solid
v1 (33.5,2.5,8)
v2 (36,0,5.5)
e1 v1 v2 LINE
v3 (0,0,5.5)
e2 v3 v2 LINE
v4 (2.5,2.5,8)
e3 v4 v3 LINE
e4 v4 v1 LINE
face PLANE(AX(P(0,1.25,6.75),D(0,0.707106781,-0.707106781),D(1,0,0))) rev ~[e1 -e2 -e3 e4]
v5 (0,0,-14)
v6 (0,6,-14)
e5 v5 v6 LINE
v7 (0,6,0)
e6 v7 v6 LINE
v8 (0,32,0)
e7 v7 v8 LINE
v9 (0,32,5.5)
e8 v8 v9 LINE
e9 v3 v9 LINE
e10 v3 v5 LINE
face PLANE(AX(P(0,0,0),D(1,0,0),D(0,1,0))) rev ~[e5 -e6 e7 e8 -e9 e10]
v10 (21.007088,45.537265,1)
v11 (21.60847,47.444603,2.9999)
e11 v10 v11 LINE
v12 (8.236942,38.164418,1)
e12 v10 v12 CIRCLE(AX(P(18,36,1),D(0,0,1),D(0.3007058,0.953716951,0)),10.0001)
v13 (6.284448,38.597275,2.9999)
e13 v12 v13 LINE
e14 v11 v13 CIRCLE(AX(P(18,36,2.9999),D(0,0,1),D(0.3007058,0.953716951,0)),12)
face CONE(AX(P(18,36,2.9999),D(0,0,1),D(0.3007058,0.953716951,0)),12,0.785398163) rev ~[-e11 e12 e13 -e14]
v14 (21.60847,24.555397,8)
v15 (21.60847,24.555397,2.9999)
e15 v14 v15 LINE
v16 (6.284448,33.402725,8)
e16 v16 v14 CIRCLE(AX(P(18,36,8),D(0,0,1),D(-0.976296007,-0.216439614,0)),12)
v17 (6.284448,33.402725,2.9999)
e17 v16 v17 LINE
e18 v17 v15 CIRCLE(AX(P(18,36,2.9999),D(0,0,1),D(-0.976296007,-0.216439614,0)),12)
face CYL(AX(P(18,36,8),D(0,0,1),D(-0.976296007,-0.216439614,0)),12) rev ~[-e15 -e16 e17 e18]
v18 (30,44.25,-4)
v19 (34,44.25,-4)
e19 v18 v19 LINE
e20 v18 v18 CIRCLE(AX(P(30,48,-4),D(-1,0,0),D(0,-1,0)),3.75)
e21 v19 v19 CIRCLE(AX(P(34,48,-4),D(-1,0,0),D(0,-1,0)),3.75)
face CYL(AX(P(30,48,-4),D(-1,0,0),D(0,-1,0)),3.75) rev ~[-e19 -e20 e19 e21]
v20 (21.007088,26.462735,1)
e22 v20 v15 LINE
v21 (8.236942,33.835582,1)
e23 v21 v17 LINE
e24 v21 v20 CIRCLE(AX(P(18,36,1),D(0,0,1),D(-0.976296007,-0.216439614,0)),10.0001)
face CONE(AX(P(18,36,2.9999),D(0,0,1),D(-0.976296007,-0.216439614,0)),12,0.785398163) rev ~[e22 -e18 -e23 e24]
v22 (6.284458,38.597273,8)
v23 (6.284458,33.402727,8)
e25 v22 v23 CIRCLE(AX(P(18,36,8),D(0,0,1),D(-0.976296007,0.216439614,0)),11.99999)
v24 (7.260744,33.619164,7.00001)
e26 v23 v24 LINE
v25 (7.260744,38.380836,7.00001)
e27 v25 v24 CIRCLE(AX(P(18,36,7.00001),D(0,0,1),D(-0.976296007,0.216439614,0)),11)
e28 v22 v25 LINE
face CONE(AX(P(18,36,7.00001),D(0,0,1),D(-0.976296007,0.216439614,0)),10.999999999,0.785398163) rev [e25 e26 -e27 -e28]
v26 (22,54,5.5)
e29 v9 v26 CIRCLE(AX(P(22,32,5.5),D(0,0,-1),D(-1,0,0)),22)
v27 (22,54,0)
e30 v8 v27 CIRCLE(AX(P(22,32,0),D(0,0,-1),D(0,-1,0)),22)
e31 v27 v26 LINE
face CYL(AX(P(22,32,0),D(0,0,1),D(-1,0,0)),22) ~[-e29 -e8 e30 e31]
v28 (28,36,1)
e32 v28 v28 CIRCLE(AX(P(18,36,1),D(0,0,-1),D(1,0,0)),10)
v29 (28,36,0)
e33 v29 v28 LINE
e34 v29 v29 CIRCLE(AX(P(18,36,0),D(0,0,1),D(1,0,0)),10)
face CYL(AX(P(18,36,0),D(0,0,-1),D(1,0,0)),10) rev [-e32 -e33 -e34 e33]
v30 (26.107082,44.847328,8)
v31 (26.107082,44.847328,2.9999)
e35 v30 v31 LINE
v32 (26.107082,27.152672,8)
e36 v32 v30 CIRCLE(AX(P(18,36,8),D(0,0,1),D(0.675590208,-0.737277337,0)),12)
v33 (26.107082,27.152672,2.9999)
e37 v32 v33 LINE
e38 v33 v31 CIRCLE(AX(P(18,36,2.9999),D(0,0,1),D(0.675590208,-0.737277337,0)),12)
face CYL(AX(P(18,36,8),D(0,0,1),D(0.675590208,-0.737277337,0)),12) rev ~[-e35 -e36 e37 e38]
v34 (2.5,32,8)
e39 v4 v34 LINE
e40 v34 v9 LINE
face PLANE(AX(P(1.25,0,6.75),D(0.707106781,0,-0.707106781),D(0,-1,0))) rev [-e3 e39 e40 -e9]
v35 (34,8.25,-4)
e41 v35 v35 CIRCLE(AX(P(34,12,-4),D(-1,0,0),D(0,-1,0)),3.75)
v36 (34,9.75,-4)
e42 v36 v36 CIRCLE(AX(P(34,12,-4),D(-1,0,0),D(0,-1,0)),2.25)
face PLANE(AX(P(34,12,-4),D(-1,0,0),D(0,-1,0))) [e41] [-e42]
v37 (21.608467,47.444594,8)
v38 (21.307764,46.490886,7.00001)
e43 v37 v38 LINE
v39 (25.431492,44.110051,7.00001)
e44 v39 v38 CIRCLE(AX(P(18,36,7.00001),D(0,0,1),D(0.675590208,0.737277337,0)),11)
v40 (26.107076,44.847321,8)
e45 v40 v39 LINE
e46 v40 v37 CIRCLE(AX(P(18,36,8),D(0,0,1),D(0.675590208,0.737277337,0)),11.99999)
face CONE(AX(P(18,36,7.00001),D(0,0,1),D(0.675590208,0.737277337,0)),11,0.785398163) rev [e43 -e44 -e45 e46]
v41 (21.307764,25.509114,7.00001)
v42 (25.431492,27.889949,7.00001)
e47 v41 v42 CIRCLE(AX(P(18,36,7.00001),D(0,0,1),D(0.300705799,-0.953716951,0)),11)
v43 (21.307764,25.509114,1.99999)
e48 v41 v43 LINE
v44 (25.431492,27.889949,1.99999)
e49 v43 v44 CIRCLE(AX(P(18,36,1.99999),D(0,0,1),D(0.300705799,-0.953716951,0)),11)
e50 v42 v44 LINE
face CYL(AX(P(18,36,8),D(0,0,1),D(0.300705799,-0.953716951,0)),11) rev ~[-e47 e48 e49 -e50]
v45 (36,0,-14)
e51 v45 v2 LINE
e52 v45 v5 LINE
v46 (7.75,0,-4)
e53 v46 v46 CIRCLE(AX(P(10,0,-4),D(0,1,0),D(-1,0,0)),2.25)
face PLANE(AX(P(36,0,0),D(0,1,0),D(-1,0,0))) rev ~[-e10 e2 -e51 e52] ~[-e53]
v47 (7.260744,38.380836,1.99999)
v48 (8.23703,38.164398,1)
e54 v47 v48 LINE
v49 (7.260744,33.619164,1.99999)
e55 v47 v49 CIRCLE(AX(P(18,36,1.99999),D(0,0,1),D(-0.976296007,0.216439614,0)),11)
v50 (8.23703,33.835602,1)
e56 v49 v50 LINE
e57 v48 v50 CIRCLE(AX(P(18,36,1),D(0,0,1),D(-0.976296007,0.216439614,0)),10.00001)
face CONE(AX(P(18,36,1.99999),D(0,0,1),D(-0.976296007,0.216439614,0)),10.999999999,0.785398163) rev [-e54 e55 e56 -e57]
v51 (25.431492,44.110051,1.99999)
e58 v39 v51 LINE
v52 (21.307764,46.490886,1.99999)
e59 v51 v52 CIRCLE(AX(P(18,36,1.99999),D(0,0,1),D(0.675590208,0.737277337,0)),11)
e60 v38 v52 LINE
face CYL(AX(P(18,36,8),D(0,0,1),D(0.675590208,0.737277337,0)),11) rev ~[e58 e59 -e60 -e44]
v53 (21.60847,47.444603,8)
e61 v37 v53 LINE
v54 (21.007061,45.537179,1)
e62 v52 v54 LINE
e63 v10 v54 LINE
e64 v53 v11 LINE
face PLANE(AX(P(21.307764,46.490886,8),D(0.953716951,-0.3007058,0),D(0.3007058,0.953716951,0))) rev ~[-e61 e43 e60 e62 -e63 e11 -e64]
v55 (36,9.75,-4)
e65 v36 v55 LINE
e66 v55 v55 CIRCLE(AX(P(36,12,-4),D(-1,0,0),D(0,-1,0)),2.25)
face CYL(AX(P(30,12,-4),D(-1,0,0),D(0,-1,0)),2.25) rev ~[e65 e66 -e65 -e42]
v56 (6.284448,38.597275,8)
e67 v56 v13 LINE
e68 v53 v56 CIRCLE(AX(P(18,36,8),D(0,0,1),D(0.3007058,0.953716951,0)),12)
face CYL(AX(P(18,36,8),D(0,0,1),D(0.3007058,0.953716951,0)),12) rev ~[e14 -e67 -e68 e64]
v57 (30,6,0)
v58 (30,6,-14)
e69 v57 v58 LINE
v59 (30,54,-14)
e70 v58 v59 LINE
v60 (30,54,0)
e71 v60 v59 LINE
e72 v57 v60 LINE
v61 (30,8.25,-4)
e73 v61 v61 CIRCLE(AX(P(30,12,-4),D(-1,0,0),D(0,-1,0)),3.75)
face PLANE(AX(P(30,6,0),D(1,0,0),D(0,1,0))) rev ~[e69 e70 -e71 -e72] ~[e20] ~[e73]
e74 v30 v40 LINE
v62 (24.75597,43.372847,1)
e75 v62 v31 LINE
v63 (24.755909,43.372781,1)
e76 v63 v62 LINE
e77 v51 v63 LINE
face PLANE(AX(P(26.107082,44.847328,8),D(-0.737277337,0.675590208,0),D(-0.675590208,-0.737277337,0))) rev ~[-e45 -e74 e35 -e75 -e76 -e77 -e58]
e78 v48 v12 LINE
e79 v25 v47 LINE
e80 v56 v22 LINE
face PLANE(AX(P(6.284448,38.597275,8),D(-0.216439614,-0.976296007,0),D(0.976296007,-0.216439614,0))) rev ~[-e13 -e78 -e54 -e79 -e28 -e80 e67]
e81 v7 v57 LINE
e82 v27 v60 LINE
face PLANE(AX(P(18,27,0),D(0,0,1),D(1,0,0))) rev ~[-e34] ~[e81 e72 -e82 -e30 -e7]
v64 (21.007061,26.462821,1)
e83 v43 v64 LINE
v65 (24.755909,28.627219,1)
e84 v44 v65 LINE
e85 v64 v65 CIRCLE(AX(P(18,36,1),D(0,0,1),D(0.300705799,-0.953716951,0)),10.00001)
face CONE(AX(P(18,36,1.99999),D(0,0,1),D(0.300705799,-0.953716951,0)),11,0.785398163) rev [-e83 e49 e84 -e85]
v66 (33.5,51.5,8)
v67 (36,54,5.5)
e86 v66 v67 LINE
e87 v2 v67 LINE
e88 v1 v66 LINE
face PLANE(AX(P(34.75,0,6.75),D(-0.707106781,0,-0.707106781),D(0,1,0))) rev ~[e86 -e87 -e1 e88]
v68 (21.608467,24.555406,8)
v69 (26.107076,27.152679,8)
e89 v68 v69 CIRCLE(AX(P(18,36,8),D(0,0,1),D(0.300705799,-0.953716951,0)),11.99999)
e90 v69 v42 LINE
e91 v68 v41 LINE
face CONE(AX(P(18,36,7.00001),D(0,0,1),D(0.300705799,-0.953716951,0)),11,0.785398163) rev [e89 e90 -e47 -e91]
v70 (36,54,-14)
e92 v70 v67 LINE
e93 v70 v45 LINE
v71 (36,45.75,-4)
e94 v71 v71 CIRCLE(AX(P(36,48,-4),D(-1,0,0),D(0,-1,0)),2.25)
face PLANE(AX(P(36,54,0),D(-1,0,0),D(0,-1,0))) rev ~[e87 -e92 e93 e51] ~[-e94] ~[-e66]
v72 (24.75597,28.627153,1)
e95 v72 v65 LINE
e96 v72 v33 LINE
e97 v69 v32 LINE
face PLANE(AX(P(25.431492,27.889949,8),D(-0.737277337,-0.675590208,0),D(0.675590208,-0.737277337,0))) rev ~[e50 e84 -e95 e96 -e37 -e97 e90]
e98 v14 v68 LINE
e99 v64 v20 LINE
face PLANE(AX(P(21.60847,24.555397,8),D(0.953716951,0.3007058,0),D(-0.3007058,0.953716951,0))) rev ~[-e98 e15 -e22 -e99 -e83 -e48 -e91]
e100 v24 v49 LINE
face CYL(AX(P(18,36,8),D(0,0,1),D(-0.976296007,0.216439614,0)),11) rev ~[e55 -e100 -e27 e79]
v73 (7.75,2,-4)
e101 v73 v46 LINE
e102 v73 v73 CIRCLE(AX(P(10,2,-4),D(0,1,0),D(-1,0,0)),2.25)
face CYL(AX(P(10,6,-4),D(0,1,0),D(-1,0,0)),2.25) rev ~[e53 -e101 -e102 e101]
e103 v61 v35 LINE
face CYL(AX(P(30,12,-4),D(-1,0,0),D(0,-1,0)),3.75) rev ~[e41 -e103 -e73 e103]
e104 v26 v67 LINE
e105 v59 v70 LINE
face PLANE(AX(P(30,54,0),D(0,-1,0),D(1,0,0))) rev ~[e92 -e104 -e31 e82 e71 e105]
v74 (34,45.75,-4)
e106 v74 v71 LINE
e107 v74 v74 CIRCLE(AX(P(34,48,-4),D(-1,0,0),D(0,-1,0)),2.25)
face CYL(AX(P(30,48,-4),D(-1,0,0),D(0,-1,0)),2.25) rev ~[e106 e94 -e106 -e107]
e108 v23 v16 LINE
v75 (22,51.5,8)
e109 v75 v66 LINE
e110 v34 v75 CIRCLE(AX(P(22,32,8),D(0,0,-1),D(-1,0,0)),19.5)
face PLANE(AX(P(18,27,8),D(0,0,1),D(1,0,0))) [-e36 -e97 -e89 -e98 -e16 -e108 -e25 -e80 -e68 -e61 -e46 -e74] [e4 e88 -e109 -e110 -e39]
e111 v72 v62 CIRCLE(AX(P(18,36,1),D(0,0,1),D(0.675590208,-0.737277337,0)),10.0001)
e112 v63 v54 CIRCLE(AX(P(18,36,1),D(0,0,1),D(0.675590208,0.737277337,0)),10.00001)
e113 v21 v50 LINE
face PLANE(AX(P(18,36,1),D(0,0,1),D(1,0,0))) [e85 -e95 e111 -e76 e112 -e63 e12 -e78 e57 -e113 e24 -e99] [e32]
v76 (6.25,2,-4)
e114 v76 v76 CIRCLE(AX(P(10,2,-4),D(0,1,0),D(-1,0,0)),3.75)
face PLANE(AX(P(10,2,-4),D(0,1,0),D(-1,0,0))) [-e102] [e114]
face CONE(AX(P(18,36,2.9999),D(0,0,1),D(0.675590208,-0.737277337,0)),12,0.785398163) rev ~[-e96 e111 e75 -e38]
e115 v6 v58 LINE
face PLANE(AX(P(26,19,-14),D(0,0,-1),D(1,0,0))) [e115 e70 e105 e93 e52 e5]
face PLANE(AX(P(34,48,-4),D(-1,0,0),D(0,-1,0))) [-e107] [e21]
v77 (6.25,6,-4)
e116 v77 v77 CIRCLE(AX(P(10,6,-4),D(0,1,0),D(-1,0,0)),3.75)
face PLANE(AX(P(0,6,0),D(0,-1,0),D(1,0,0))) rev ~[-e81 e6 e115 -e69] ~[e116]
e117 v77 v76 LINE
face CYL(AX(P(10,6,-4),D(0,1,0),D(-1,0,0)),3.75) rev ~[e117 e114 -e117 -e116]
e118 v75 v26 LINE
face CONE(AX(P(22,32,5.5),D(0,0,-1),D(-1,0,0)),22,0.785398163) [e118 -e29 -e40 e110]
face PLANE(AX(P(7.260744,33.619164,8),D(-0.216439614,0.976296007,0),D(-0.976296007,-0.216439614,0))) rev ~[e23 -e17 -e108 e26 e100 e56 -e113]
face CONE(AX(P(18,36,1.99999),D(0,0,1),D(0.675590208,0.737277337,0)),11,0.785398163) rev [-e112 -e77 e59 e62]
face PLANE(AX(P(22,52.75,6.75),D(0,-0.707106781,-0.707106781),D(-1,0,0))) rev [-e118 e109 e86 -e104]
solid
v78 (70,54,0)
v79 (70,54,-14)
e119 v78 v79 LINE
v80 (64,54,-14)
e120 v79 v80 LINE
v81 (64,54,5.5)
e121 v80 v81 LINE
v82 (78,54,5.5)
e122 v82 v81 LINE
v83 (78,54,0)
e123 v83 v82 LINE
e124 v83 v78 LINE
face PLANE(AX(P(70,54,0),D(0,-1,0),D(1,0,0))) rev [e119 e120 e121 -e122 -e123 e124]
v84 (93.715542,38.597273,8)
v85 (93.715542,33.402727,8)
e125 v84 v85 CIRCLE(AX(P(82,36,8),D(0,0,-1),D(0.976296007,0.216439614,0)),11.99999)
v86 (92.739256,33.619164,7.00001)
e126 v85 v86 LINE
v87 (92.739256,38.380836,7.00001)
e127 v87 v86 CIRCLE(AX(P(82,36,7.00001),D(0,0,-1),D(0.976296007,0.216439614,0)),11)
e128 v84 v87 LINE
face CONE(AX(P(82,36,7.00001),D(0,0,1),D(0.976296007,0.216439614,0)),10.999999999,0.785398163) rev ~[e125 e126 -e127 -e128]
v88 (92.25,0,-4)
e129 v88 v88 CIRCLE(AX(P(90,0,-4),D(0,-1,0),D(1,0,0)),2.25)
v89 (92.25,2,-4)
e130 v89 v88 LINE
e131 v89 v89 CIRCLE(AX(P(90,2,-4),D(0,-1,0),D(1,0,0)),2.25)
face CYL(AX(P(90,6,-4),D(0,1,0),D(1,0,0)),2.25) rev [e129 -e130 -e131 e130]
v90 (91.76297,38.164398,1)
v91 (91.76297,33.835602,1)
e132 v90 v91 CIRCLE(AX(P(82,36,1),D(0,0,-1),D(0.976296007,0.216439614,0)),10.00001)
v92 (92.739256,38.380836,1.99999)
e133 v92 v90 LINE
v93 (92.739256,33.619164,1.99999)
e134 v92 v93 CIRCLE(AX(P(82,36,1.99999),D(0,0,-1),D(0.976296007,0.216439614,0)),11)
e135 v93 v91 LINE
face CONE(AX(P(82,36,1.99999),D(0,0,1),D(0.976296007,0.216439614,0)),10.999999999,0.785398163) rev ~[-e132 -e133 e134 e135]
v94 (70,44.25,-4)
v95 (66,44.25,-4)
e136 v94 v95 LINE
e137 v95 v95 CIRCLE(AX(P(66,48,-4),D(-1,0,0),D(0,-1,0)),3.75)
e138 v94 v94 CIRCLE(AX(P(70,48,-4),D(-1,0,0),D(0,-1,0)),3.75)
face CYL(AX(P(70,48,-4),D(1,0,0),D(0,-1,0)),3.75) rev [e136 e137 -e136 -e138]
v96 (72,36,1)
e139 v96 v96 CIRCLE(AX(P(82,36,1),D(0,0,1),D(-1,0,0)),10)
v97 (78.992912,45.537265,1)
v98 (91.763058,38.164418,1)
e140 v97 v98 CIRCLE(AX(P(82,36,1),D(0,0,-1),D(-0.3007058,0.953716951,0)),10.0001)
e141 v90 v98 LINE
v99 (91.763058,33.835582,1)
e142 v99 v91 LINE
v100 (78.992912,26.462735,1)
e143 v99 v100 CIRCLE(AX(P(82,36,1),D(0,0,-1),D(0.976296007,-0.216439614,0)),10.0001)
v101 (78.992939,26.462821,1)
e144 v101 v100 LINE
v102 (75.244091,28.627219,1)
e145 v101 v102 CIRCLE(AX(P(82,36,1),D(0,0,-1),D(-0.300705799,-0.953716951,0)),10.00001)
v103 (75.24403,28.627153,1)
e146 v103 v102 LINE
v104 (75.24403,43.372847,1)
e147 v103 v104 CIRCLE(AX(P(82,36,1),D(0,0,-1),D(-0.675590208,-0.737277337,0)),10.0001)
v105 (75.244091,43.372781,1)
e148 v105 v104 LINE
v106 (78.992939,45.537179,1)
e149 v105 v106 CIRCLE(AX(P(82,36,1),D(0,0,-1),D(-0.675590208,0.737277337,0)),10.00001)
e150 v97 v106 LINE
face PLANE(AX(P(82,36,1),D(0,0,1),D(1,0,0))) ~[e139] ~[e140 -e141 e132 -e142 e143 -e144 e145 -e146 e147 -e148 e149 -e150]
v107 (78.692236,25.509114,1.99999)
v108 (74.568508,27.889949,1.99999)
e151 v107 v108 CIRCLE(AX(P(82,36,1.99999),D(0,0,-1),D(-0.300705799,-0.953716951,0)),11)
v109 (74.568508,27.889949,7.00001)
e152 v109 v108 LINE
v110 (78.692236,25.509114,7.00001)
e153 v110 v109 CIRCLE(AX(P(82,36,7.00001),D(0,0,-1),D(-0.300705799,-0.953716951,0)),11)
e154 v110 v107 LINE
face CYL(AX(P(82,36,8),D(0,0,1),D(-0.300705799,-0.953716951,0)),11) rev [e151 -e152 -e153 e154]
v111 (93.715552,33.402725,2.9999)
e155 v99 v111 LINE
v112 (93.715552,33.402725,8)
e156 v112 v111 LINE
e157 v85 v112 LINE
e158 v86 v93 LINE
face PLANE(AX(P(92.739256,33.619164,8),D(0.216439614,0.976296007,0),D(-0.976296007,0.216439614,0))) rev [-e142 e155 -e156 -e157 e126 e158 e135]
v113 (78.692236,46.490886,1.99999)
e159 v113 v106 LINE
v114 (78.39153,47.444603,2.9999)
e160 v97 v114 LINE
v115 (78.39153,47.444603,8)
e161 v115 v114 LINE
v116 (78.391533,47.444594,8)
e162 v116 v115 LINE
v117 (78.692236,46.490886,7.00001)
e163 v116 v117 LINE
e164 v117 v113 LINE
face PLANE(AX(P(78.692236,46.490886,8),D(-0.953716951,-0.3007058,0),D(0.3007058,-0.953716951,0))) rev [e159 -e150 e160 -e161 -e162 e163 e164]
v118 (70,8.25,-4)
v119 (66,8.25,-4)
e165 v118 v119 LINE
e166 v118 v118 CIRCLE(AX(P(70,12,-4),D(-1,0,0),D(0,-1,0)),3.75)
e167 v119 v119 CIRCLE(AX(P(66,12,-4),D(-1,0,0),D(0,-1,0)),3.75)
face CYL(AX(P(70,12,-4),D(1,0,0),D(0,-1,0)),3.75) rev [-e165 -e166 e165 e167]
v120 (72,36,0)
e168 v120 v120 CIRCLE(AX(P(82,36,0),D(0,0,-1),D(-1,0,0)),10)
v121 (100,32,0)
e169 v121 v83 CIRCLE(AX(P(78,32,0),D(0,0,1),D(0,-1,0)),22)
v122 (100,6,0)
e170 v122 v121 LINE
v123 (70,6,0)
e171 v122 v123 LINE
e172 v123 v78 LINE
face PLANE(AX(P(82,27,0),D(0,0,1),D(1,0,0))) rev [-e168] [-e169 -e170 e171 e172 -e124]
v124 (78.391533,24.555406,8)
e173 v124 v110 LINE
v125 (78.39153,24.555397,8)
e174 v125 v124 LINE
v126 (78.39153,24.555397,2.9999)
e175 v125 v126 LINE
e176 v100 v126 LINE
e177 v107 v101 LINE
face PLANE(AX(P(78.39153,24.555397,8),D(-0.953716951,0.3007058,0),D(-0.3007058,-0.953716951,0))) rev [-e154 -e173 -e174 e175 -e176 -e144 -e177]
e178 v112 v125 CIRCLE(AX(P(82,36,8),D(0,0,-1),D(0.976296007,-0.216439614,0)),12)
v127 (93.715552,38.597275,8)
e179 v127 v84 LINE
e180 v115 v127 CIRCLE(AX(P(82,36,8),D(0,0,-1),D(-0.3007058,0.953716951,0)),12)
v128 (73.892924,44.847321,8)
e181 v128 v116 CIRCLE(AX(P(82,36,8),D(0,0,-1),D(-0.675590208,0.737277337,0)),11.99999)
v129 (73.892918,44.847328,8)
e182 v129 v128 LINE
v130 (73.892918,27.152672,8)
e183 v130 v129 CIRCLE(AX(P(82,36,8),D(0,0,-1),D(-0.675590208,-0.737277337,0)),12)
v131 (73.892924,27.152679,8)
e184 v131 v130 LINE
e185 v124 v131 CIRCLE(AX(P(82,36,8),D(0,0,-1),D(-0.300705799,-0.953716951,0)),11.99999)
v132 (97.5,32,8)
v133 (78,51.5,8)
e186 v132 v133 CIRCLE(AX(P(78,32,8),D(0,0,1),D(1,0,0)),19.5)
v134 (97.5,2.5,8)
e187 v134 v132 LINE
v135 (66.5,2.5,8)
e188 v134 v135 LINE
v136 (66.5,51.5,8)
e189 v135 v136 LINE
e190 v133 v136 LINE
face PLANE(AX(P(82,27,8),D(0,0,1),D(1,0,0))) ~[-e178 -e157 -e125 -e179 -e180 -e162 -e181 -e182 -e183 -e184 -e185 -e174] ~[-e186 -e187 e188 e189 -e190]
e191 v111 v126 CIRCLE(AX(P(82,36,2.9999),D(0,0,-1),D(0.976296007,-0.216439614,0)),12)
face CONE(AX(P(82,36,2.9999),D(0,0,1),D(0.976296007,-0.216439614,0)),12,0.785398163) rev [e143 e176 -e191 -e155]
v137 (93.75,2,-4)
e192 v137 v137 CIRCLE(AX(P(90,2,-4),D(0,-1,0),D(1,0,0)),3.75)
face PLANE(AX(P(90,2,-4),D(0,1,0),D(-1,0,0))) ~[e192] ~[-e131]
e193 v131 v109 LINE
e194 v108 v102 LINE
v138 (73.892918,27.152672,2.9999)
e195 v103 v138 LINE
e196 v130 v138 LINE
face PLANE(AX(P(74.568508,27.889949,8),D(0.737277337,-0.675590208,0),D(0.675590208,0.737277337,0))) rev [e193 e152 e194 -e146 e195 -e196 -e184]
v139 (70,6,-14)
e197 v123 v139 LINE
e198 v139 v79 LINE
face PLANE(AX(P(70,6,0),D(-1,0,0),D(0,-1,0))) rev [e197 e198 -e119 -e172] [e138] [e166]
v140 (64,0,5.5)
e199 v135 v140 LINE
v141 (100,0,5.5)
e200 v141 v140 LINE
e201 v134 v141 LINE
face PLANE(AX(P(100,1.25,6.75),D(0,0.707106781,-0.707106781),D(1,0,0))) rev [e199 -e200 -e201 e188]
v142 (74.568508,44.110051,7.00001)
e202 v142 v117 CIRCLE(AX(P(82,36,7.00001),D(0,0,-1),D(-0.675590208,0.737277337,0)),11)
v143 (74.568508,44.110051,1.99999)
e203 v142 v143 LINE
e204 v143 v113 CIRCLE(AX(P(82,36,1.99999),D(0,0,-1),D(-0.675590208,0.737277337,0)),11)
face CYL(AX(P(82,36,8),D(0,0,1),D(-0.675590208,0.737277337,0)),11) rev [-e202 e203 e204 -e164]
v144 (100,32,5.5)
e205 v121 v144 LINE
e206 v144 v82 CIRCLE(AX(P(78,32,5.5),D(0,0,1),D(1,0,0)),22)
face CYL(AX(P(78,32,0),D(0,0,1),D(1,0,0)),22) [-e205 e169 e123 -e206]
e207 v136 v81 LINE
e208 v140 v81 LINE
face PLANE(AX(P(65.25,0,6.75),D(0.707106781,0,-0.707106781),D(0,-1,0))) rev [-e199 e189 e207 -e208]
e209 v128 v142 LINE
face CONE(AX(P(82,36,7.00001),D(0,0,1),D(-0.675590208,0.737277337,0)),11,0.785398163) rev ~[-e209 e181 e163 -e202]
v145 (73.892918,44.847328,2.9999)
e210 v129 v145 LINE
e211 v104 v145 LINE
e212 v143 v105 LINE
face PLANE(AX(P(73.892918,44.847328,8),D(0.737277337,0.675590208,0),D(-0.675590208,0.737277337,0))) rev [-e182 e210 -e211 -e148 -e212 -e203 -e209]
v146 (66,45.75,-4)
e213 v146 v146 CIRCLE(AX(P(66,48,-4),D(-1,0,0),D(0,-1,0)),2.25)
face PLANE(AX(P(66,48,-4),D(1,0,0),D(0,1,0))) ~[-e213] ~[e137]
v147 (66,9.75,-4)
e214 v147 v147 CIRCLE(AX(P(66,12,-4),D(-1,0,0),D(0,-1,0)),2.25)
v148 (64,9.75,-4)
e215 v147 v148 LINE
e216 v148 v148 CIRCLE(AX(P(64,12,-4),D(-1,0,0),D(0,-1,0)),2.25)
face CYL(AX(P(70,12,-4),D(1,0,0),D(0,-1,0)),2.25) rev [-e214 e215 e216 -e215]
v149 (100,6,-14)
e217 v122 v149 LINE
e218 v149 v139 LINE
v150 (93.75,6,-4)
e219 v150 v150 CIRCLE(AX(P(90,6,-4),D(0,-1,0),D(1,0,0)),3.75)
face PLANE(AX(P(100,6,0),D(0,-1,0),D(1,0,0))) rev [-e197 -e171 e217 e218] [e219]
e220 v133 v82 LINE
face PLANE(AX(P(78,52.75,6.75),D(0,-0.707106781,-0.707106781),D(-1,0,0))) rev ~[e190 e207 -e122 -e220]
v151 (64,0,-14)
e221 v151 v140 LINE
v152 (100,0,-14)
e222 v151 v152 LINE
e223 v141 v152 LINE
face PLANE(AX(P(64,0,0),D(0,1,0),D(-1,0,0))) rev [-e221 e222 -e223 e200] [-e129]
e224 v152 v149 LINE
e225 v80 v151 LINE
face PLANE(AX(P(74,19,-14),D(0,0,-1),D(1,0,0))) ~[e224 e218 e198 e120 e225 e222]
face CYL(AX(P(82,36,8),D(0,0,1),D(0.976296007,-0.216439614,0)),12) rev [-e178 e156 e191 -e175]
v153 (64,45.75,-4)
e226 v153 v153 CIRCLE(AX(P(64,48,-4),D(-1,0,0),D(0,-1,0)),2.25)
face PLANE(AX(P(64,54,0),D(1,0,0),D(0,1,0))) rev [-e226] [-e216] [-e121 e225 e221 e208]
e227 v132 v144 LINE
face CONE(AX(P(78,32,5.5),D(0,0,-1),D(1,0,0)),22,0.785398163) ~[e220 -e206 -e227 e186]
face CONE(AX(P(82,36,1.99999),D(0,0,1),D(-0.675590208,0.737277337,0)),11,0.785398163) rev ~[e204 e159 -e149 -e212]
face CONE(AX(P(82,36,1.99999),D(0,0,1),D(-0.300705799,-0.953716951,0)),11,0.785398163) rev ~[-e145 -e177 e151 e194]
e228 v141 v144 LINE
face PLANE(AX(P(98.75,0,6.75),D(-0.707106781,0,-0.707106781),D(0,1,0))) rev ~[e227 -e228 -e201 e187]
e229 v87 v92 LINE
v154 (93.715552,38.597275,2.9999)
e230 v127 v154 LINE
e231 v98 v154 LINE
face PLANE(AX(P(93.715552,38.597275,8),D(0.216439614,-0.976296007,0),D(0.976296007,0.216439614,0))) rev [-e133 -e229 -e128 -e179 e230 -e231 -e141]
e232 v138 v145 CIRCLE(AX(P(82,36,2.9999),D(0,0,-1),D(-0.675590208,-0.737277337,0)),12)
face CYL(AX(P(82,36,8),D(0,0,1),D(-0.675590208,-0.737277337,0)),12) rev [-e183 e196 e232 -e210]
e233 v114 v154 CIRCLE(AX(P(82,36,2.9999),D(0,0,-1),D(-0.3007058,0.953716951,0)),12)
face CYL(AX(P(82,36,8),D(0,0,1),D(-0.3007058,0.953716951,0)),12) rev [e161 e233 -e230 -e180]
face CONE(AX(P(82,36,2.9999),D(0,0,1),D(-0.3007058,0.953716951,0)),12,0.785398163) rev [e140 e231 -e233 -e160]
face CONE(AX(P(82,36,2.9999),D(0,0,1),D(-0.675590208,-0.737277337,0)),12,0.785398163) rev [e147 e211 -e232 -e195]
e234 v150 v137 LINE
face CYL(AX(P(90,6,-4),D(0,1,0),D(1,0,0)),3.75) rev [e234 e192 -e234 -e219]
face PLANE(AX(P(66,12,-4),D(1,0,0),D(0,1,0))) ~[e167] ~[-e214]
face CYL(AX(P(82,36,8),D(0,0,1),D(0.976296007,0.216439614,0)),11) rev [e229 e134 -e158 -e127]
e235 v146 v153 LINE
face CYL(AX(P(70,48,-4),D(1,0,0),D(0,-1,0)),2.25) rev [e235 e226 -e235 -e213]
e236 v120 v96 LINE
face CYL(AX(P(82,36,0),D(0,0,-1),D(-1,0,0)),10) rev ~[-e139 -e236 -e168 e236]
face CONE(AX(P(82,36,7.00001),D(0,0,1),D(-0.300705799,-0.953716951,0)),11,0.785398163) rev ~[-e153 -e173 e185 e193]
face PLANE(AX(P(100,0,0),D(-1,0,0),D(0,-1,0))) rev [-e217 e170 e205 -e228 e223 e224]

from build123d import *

# Parameters (mm, degrees)
F0_W      = 36
F0_H      = 54
F0_R      = 10
F1_DEPTH  = 8
F3_DEPTH  = 14
F4_R      = 2.25
F5_DEPTH  = 6.001
F6_R      = 3.75
F7_DEPTH  = 4
F8_R      = 2.25
F9_DEPTH  = 6.001
F10_R     = 3.75
F11_DEPTH = 4
F13_DEPTH = 7
F14_R     = 22
F15_SIZE  = 2.5
F16_SIZE  = 0.99999
F17_SIZE  = 1.9999


# Not quite as in the source:
# - a fillet or chamfer is up to 0.001 mm smaller than in the source, because OpenCascade refuses the exact size


with BuildPart() as f1:
    # F0 (on Top) → F1 (new body)
    with BuildSketch(Plane.XY):
        with Locations((18, 27)):
            Rectangle(F0_W, F0_H)
        with Locations((18, 36)):
            Circle(F0_R, mode=Mode.SUBTRACT)
    extrude(amount=F1_DEPTH)

    # F2 (on face) → F3 (join)
    with BuildSketch(Plane(origin=(0, 0, 0), x_dir=(1, 0, 0), z_dir=(0, 0, -1))):
        Polygon((36, 0), (0, 0), (0, -6), (30, -6), (30, -54), (36, -54), align=None)
    extrude(amount=F3_DEPTH)

    # F4 (on face) → F5 (cut, through all)
    with BuildSketch(Plane(origin=(0, 6, 0), x_dir=(-1, 0, 0), z_dir=(0, 1, 0))):
        with Locations((-10, -4)):
            Circle(F4_R)
    extrude(amount=-F5_DEPTH, mode=Mode.SUBTRACT)

    # F6 (on face) → F7 (cut)
    with BuildSketch(Plane(origin=(0, 6, 0), x_dir=(-1, 0, 0), z_dir=(0, 1, 0))):
        with Locations((-10, -4)):
            Circle(F6_R)
    extrude(amount=-F7_DEPTH, mode=Mode.SUBTRACT)

    # F8 (on face) → F9 (cut, through all)
    with BuildSketch(Plane(origin=(30, 0, 0), x_dir=(0, -1, 0), z_dir=(-1, 0, 0))):
        with Locations((-48, -4)):
            Circle(F8_R)
        with Locations((-12, -4)):
            Circle(F8_R)
    extrude(amount=-F9_DEPTH, mode=Mode.SUBTRACT)

    # F10 (on face) → F11 (cut)
    with BuildSketch(Plane(origin=(30, 0, 0), x_dir=(0, -1, 0), z_dir=(-1, 0, 0))):
        with Locations((-48, -4)):
            Circle(F10_R)
        with Locations((-12, -4)):
            Circle(F10_R)
    extrude(amount=-F11_DEPTH, mode=Mode.SUBTRACT)

    # F12 (on face) → F13 (cut)
    with BuildSketch(Plane.XY.offset(8)):
        with BuildLine():
            Line((21.3077637945, 46.4908864582), (21.6084695941, 47.444603409))
            ThreePointArc((21.6084695941, 47.444603409), (12, 46.3923048454), (6.2844479146, 38.5972753673))
            Line((6.2844479146, 38.5972753673), (7.2607439217, 38.3808357533))
            ThreePointArc((7.2607439217, 38.3808357533), (7, 36), (7.2607439217, 33.6191642467))
            Line((7.2607439217, 33.6191642467), (6.2844479146, 33.4027246327))
            ThreePointArc((6.2844479146, 33.4027246327), (12, 25.6076951546), (21.6084695941, 24.555396591))
            Line((21.6084695941, 24.555396591), (21.3077637945, 25.5091135418))
            ThreePointArc((21.3077637945, 25.5091135418), (23.5, 26.4737205584), (25.4314922838, 27.8899492951))
            Line((25.4314922838, 27.8899492951), (26.1070824914, 27.1526719583))
            ThreePointArc((26.1070824914, 27.1526719583), (30, 36), (26.1070824914, 44.8473280417))
            Line((26.1070824914, 44.8473280417), (25.4314922838, 44.1100507049))
            ThreePointArc((25.4314922838, 44.1100507049), (23.5, 45.5262794416), (21.3077637945, 46.4908864582))
        make_face()
    extrude(amount=-F13_DEPTH, mode=Mode.SUBTRACT)

    # F14
    f14_edges = [f1.edges().sort_by_distance(p)[0] for p in [
        (0, 54, 4),
    ]]
    fillet(f14_edges, radius=F14_R)

    # F15
    f15_edges = [f1.edges().sort_by_distance(p)[0] for p in [
        (36, 27, 8),
        (18, 0, 8),
        (29, 54, 8),
        (0, 16, 8),
    ]]
    chamfer(f15_edges, length=F15_SIZE)

    # F16 (size 1 in the source; OpenCascade refuses exactly that, so slightly less here)
    f16_edges = [f1.edges().sort_by_distance(p)[0] for p in [
        (23.5, 26.473721, 1),
        (7, 36, 1),
        (23.5, 45.526279, 1),
        (7, 36, 8),
        (23.5, 45.526279, 8),
        (23.5, 26.473721, 8),
    ]]
    chamfer(f16_edges, length=F16_SIZE)

    # F17 (size 2 in the source; OpenCascade refuses exactly that, so slightly less here)
    f17_edges = [f1.edges().sort_by_distance(p)[0] for p in [
        (12, 25.607695, 1),
        (30, 36, 1),
        (12, 46.392305, 1),
    ]]
    chamfer(f17_edges, length=F17_SIZE)


with BuildPart() as f19_1:
    # F19: instance of F1
    add(f1.part.mirror(Plane.YZ.offset(50)))


solid = Compound([f1.part, f19_1.part])
